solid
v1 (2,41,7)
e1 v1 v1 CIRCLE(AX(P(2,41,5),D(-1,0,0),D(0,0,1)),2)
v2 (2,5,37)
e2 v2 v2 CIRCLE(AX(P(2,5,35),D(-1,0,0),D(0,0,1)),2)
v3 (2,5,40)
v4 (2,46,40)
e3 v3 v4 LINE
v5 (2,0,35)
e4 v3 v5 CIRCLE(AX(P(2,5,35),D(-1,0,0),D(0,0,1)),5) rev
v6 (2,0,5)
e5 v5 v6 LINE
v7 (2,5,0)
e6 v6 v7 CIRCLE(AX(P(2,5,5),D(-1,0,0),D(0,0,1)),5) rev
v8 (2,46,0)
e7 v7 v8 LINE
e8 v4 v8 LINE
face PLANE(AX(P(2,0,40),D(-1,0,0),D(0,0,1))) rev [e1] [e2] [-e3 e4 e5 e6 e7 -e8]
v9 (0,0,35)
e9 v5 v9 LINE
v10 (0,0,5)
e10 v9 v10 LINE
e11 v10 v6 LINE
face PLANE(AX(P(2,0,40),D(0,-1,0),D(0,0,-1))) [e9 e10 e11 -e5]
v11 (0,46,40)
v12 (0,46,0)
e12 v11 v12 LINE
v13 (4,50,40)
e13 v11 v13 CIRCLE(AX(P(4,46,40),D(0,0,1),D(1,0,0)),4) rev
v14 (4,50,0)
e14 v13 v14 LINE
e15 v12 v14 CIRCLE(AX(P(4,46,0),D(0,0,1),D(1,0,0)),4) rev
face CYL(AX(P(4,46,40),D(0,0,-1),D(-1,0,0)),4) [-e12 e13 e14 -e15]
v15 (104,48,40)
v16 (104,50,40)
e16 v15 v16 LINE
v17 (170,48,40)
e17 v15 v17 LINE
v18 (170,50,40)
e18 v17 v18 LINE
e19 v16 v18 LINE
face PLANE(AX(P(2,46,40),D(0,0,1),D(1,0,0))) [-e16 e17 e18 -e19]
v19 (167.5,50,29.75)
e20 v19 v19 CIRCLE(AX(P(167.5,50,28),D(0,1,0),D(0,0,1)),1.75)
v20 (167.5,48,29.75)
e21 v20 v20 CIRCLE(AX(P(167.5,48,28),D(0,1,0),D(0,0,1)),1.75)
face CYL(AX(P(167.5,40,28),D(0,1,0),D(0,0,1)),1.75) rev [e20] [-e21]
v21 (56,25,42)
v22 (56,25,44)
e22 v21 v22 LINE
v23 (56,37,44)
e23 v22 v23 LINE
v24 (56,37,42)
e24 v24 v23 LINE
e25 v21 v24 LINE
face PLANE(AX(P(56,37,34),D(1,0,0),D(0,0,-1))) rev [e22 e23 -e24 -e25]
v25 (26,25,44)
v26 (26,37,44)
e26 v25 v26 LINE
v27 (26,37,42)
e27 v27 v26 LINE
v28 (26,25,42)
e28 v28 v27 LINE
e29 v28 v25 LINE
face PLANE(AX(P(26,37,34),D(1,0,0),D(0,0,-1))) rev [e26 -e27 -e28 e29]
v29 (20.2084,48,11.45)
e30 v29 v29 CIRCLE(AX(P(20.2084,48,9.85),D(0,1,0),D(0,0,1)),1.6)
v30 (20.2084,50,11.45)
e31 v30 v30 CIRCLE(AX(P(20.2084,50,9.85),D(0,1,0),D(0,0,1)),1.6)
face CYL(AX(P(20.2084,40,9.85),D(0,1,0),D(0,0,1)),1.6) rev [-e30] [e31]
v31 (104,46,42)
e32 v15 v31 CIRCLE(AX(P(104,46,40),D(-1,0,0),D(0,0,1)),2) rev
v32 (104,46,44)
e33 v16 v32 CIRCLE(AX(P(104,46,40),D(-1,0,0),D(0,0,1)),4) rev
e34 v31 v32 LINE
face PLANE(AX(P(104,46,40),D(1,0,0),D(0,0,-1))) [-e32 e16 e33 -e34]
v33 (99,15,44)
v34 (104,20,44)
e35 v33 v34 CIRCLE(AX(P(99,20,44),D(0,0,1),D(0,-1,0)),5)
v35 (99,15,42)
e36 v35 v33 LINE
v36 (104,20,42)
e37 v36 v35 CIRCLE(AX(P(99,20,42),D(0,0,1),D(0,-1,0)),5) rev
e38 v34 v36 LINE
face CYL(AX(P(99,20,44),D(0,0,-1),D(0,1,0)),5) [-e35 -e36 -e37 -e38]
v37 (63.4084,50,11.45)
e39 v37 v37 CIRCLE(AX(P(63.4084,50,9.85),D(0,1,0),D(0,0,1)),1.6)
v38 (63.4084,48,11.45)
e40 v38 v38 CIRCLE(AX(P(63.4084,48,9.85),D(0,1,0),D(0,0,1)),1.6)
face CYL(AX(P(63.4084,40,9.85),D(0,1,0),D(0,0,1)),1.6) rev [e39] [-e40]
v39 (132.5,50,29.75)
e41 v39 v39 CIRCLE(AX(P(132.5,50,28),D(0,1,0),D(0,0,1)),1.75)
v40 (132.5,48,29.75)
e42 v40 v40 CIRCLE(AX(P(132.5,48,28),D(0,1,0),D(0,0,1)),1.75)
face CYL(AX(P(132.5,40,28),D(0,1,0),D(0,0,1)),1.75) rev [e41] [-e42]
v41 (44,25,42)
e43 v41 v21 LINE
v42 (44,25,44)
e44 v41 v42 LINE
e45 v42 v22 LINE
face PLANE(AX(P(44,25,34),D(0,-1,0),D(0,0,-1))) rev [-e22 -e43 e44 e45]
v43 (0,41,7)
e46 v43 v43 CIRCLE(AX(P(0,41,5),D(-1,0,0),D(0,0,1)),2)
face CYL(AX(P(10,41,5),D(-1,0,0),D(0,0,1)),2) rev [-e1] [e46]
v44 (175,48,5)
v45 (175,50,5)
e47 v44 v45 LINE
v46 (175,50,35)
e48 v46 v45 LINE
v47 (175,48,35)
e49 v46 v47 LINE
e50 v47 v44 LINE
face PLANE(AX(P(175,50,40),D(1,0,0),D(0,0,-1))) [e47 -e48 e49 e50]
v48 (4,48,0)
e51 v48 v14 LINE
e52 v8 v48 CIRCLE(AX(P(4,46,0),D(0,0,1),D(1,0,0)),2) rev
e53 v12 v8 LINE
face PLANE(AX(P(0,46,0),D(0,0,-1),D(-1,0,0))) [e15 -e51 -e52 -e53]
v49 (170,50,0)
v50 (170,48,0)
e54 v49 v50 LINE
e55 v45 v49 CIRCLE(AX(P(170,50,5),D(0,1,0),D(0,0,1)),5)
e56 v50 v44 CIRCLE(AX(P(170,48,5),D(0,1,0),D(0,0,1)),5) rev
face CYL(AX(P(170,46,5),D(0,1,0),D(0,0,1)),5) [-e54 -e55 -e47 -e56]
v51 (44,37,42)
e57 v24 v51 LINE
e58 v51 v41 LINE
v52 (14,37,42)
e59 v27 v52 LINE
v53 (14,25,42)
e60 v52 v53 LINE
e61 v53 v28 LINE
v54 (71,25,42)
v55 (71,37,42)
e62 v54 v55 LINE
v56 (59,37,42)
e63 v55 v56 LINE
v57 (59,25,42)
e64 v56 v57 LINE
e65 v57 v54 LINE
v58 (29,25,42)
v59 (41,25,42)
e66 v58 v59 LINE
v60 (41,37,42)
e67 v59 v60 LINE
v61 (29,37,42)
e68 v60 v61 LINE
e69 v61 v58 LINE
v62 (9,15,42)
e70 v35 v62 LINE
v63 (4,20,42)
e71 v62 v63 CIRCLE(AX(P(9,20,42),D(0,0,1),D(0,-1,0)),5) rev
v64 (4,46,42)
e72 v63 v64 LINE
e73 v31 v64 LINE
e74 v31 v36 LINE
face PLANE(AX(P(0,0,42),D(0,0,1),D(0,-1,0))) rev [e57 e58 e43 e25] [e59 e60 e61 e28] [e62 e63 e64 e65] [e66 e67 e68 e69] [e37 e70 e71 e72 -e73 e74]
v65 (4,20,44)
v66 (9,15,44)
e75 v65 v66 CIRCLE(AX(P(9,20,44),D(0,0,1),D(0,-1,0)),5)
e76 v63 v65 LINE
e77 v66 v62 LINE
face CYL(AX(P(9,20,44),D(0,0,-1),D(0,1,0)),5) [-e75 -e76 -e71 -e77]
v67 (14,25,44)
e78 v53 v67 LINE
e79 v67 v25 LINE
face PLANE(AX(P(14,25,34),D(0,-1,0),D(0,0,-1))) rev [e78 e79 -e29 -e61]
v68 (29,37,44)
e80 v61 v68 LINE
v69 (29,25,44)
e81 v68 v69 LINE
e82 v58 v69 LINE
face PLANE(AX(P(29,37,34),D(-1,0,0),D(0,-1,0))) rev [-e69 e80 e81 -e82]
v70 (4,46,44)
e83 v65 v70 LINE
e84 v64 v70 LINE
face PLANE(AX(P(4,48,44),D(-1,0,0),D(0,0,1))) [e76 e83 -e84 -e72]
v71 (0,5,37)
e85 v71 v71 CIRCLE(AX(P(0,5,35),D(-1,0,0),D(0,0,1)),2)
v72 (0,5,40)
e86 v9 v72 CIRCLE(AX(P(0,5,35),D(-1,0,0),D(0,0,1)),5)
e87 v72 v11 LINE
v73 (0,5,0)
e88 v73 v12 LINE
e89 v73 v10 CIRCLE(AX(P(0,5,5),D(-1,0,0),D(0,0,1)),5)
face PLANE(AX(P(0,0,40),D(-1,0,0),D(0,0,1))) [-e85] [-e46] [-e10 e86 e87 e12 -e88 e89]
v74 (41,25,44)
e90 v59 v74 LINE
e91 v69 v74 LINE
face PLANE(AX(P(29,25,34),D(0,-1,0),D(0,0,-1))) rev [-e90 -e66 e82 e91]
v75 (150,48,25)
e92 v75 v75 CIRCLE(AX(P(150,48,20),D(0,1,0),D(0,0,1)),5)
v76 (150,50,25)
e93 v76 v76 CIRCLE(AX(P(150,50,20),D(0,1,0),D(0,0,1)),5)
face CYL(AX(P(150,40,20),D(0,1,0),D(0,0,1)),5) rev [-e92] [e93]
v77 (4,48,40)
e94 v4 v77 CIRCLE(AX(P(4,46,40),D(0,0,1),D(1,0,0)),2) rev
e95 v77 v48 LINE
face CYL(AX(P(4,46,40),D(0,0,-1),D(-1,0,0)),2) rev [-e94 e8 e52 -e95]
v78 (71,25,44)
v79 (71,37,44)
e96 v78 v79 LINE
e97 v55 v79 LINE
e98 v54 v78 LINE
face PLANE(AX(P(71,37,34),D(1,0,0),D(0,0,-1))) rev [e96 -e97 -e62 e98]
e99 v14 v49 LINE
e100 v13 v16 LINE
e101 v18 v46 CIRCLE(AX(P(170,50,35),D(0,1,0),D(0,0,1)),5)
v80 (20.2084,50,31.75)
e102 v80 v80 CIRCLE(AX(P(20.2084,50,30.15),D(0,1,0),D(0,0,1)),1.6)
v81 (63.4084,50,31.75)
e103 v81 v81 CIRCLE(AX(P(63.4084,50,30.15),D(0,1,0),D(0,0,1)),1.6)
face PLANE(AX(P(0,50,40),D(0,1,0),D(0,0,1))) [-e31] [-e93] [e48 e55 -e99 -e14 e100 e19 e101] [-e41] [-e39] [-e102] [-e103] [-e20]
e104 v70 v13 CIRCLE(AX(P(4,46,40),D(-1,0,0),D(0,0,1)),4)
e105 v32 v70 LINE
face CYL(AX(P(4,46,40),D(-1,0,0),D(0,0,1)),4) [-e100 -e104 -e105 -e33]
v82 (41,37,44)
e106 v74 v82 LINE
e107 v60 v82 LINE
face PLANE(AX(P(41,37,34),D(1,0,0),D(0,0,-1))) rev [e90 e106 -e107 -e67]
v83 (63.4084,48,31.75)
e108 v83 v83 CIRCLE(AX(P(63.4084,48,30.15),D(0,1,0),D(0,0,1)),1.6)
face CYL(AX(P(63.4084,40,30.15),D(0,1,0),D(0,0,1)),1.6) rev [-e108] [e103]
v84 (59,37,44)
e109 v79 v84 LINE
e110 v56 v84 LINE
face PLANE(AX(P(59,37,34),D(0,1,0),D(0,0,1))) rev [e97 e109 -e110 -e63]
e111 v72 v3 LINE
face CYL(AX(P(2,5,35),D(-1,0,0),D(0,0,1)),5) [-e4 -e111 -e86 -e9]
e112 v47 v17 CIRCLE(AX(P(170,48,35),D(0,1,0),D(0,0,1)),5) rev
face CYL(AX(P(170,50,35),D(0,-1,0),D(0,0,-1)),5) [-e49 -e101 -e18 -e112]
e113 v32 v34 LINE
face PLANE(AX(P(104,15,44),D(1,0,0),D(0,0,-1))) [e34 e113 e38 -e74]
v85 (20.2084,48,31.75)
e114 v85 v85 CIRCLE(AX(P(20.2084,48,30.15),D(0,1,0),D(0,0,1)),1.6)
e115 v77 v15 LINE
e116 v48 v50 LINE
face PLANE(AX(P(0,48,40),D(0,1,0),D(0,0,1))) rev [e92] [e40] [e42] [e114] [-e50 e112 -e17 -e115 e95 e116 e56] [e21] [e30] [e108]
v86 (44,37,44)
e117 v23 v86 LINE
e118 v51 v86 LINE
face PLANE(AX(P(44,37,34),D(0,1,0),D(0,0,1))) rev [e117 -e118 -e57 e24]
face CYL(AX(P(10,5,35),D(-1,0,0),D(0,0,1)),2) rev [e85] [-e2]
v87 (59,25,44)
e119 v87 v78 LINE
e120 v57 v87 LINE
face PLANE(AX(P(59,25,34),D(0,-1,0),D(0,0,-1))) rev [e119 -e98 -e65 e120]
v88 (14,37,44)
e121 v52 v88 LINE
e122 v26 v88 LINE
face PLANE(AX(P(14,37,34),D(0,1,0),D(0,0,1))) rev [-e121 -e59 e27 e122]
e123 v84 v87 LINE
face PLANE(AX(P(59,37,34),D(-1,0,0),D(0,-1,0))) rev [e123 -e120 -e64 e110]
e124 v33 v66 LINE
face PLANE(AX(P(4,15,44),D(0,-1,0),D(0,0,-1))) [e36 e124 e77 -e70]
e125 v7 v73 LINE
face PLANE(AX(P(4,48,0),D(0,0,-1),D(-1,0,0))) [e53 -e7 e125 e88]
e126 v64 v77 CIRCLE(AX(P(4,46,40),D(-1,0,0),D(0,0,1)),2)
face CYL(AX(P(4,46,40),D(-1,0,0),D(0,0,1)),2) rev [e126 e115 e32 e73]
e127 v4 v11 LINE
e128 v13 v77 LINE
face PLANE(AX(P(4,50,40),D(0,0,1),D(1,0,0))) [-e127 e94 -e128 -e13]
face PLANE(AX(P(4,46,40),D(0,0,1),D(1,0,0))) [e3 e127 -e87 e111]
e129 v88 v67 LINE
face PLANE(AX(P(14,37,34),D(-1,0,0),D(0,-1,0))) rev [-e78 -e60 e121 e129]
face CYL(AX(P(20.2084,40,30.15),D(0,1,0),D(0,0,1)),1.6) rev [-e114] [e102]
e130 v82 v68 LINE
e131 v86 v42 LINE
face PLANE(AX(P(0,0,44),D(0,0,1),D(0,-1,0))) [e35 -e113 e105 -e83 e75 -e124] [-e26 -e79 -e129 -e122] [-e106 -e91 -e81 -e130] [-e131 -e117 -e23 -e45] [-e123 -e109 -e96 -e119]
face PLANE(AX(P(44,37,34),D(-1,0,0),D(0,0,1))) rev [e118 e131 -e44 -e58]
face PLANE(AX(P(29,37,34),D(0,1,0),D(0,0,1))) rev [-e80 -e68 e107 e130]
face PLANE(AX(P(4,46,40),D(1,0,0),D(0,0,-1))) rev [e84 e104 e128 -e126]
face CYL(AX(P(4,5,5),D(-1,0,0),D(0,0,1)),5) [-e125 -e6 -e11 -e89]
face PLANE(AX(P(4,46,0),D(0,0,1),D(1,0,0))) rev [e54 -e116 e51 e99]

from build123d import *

# Parameters (mm, degrees)
BASE_FLANGE1_DEPTH = 40
SKETCH6_R          = 2
CUT_EXTRUDE1_DEPTH = 10
SKETCH7_R          = 5
SKETCH7_R_2        = 1.75
CUT_EXTRUDE2_DEPTH = 10
SKETCH8_R          = 1.6
CUT_EXTRUDE3_DEPTH = 10
EDGE_FLANGE1_DEPTH = 100
FILLET1_R          = 5
SKETCH12_W         = 12
SKETCH12_H         = 12
CUT_EXTRUDE4_DEPTH = 10


# Sheet-metal steps are written as plain solids
with BuildPart() as part:
    # Sketch1 → Base-Flange1 (new body)
    with BuildSketch(Plane.XY):
        with BuildLine():
            Line((0, 0), (0, 46))
            ThreePointArc((0, 46), (1.171572875, 48.828427125), (4, 50))
            Line((4, 50), (175, 50))
            Line((175, 50), (175, 48))
            Line((175, 48), (4, 48))
            ThreePointArc((4, 48), (2.585786438, 47.414213562), (2, 46))
            Line((2, 46), (2, 0))
            Line((2, 0), (0, 0))
        make_face()
    extrude(amount=BASE_FLANGE1_DEPTH)

    # Sketch6 → Cut-Extrude1 (cut)
    with BuildSketch(Plane.ZY):
        with Locations((5, 41)):
            Circle(SKETCH6_R)
        with Locations((35, 5)):
            Circle(SKETCH6_R)
    extrude(amount=-CUT_EXTRUDE1_DEPTH, mode=Mode.SUBTRACT)

    # Sketch7 → Cut-Extrude2 (cut)
    with BuildSketch(Plane(origin=(0, 50, 0), x_dir=(1, 0, 0), z_dir=(0, 1, 0))):
        with Locations(Location((150, -20, 0), (0, 0, 270))):
            Circle(SKETCH7_R)
        with Locations(Location((132.5, -28, 0), (0, 0, 270))):
            Circle(SKETCH7_R_2)
        with Locations(Location((167.5, -28, 0), (0, 0, 270))):
            Circle(SKETCH7_R_2)
    extrude(amount=-CUT_EXTRUDE2_DEPTH, mode=Mode.SUBTRACT)

    # Sketch8 → Cut-Extrude3 (cut)
    with BuildSketch(Plane(origin=(0, 50, 0), x_dir=(1, 0, 0), z_dir=(0, 1, 0))):
        with Locations(Location((20.208399829, -9.85, 0), (0, 0, 270))):
            Circle(SKETCH8_R)
        with Locations(Location((63.408399829, -9.85, 0), (0, 0, 270))):
            Circle(SKETCH8_R)
        with Locations(Location((63.408399829, -30.15, 0), (0, 0, 270))):
            Circle(SKETCH8_R)
        with Locations(Location((20.208399829, -30.15, 0), (0, 0, 270))):
            Circle(SKETCH8_R)
    extrude(amount=-CUT_EXTRUDE3_DEPTH, mode=Mode.SUBTRACT)

    # Edge-Flange1 section (across the edge) → Edge-Flange1 (add)
    with BuildSketch(Plane(origin=(104, 48, 42), x_dir=(0, 0, -1), z_dir=(-1, 0, 0))):
        with BuildLine():
            Line((-2, 2), (-2, 33))
            Line((-2, 33), (0, 33))
            Line((0, 33), (0, 2))
            ThreePointArc((0, 2), (0.585786438, 0.585786438), (2, 0))
            Line((2, 0), (2, -2))
            ThreePointArc((2, -2), (-0.828427125, -0.828427125), (-2, 2))
        make_face()
    extrude(amount=EDGE_FLANGE1_DEPTH)

    # Fillet1
    fillet1_edges = [part.edges().sort_by_distance(p)[0] for p in [
        (104, 15, 43),
        (4, 15, 43),
        (1, 0, 40),
        (175, 49, 40),
        (1, 0, 0),
        (175, 49, 0),
    ]]
    fillet(fillet1_edges, radius=FILLET1_R)

    # Sketch12 → Cut-Extrude4 (cut)
    with BuildSketch(Plane.XY.offset(44)):
        with Locations((20, 31)):
            Rectangle(SKETCH12_W, SKETCH12_H)
        with Locations((35, 31)):
            Rectangle(SKETCH12_W, SKETCH12_H)
        with Locations((50, 31)):
            Rectangle(SKETCH12_W, SKETCH12_H)
        with Locations((65, 31)):
            Rectangle(SKETCH12_W, SKETCH12_H)
    extrude(amount=-CUT_EXTRUDE4_DEPTH, mode=Mode.SUBTRACT)


solid = part.part
